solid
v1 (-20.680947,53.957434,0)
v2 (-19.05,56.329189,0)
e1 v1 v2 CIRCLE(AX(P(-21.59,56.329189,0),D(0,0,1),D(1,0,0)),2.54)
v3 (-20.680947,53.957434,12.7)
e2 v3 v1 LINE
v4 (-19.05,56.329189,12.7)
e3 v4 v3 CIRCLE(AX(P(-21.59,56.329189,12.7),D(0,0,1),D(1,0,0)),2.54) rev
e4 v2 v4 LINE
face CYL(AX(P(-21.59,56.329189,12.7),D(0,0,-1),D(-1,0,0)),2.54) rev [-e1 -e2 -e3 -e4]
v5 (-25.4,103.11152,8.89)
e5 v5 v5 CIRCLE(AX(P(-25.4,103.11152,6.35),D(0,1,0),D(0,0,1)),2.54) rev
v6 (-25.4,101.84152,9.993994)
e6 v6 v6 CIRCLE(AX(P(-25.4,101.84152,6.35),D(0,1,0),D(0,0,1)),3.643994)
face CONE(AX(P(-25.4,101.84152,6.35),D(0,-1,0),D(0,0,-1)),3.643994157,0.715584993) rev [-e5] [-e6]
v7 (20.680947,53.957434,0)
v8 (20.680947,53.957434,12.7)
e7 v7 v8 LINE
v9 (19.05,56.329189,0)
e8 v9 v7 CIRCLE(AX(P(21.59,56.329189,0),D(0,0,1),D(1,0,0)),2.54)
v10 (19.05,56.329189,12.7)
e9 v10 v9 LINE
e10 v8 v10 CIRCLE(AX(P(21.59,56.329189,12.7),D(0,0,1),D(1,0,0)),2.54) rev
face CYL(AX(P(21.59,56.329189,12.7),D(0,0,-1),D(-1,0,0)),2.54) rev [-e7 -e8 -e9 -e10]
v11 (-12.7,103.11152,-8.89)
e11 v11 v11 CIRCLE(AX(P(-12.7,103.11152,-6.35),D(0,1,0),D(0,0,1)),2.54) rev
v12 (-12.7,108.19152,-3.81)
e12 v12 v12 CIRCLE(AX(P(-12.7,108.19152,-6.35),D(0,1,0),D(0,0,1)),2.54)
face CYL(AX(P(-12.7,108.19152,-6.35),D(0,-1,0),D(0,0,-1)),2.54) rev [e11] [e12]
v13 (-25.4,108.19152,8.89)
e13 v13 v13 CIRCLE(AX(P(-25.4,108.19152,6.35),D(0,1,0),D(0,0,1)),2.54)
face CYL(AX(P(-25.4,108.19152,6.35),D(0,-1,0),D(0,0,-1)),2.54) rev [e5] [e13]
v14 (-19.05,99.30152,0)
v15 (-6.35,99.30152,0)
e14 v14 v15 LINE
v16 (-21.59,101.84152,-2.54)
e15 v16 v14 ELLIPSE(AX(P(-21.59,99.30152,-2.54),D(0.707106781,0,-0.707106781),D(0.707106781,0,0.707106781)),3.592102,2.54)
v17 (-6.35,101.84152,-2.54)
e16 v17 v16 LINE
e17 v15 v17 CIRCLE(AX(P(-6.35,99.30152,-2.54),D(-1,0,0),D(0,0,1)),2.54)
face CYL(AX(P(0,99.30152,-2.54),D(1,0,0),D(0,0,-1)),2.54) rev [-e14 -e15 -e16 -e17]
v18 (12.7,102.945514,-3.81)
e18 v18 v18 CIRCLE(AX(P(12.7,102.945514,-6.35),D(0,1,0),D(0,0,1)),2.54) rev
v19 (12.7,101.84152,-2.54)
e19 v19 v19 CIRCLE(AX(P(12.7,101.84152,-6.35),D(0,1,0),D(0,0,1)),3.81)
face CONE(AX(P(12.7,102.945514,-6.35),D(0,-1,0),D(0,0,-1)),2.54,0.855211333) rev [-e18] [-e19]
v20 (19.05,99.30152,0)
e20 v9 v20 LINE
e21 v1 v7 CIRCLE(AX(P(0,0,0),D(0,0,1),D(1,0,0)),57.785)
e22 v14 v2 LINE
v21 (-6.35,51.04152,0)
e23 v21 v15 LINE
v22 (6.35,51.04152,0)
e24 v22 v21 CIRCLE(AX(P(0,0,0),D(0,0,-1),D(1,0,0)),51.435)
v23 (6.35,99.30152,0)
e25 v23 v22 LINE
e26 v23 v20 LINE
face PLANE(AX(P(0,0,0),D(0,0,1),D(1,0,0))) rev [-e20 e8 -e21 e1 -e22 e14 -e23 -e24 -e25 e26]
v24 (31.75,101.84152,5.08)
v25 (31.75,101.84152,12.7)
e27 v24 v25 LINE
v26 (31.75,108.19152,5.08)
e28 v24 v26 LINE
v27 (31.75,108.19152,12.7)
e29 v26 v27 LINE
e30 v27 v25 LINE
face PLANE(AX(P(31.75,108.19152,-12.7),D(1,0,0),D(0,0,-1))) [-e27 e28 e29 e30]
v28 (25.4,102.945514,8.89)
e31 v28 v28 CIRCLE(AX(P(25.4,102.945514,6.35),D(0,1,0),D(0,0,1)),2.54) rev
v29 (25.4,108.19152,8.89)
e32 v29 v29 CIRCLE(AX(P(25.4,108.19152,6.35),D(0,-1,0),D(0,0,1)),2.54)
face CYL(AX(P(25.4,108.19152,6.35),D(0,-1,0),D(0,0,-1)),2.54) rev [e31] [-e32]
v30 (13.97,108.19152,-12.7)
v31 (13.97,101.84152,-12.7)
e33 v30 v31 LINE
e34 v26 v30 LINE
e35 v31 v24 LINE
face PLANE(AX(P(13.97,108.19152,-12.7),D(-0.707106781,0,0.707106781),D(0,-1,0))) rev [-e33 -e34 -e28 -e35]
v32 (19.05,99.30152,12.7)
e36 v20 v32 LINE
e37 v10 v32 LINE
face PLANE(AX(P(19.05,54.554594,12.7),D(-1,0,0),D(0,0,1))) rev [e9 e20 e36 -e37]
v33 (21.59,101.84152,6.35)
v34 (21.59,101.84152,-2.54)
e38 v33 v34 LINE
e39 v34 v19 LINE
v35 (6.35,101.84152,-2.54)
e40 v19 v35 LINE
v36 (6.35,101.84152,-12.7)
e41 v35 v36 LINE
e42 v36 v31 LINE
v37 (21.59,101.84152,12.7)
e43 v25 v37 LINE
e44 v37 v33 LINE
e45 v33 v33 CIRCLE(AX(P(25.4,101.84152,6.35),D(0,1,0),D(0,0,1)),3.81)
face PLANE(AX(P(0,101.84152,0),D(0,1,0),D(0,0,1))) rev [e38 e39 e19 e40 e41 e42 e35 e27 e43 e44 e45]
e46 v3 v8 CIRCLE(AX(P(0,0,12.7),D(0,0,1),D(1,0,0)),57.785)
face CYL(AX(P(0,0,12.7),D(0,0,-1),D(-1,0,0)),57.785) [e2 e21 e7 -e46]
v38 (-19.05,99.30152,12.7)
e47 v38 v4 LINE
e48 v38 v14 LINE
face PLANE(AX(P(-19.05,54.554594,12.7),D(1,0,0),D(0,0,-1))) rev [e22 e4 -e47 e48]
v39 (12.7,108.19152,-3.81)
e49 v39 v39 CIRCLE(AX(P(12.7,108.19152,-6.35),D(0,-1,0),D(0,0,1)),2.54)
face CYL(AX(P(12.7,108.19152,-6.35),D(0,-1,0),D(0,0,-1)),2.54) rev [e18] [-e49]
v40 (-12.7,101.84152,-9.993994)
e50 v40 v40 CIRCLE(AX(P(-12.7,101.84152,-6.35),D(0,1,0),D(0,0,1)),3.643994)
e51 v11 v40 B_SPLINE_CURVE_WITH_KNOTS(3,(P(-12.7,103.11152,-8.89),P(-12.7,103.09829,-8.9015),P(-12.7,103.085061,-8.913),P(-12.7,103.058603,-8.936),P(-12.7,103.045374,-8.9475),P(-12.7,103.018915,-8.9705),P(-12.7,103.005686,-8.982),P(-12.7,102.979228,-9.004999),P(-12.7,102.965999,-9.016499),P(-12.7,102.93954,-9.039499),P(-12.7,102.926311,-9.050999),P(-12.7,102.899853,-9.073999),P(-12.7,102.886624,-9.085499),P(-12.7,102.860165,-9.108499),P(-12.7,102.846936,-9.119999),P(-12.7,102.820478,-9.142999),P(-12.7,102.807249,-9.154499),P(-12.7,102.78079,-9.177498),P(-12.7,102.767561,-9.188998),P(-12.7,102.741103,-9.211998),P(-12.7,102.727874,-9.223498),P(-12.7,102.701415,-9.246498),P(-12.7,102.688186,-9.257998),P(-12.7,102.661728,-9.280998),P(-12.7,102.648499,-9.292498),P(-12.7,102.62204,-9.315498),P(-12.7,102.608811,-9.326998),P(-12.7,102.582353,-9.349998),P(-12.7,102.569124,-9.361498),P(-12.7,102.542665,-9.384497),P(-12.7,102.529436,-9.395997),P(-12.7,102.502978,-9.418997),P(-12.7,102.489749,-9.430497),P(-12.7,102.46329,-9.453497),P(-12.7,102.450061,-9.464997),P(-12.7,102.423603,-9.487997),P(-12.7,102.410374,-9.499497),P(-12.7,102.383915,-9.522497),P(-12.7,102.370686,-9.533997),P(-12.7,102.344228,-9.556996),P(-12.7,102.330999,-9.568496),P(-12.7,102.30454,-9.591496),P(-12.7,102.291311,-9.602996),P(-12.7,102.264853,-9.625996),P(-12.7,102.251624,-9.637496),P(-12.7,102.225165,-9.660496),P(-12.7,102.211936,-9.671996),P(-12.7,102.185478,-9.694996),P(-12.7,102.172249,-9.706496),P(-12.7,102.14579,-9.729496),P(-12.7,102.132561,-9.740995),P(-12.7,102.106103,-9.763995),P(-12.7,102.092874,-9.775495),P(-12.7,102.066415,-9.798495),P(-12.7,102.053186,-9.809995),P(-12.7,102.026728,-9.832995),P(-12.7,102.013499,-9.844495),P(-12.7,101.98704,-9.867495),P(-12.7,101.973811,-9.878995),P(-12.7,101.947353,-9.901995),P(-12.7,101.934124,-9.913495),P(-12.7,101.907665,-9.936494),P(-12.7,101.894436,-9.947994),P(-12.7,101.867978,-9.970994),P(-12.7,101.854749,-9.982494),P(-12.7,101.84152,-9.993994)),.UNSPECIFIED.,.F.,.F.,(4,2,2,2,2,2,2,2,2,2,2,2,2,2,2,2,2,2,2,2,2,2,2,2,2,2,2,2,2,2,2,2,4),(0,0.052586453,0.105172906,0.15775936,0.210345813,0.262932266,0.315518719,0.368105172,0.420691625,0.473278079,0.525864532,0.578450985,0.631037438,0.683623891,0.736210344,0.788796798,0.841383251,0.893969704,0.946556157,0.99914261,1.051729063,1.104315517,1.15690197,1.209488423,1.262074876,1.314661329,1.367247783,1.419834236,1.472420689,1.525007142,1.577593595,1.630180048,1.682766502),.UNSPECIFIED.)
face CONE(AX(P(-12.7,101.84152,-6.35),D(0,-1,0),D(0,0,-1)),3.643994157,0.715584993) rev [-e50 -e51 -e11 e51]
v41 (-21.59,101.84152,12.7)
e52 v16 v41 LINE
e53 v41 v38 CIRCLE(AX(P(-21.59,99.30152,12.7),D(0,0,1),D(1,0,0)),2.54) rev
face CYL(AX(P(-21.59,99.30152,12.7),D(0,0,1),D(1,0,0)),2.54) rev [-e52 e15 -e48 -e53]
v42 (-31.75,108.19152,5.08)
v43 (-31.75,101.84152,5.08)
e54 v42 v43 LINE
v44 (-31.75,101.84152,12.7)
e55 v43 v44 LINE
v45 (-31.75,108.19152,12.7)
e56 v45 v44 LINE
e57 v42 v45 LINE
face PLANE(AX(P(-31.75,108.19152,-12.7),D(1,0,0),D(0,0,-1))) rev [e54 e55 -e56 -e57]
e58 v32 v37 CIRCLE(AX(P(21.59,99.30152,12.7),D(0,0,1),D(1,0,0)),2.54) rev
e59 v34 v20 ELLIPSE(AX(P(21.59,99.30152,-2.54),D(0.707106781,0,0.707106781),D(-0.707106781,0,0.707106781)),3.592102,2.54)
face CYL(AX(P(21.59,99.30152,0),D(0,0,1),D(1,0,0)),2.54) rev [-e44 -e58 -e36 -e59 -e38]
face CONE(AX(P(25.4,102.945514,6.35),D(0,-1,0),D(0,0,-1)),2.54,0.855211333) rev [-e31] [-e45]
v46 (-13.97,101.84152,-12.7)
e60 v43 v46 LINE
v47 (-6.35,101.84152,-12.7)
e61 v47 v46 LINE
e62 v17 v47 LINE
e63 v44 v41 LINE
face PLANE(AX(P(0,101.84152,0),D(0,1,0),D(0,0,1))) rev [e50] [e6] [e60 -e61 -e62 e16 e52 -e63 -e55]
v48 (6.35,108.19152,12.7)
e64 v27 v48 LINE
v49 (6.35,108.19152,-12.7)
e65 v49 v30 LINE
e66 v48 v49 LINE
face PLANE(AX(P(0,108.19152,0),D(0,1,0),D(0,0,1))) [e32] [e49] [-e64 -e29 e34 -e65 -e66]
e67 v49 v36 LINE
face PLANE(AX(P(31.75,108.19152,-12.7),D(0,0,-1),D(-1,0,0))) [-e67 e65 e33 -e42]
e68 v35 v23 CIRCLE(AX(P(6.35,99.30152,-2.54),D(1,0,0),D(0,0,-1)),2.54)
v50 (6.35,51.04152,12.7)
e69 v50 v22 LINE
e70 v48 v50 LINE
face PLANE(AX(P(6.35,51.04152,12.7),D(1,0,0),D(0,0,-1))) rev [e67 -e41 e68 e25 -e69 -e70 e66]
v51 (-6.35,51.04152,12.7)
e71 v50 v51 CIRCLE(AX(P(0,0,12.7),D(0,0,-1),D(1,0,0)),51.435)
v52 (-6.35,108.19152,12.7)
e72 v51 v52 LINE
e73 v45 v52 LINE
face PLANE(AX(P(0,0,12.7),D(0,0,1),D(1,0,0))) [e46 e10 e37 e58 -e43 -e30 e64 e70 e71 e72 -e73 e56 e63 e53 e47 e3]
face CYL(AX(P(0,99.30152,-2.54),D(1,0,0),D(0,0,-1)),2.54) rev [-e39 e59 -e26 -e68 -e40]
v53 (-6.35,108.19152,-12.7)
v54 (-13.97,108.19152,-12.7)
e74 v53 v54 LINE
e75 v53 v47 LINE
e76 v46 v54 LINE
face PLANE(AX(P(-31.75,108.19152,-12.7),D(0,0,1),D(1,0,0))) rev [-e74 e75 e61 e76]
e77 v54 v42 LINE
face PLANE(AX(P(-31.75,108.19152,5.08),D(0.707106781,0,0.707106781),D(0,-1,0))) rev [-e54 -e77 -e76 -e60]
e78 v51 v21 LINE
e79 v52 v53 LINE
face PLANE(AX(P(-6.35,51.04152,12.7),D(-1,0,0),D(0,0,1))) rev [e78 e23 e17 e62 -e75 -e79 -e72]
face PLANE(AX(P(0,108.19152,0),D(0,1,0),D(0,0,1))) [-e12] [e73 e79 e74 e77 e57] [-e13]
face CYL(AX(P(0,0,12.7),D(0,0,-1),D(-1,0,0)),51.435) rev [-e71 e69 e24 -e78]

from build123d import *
from OCP.BRepFilletAPI import BRepFilletAPI_MakeChamfer

# Parameters (mm, degrees)
BOSS_EXTRUDE1_DEPTH = 12.7
SKETCH2_W           = 25.4
SKETCH2_H           = 25.4
SKETCH2_R           = 2.54
BOSS_EXTRUDE2_DEPTH = 6.35
CHAMFER2_SIZE       = 1.27
CHAMFER2_SIZE2      = 1.103994157
CHAMFER3_SIZE       = 17.78
FILLET3_R           = 2.54


with BuildPart() as part:
    # Sketch1 → Boss-Extrude1 (new body)
    with BuildSketch(Plane.XY):
        with BuildLine():
            Line((-6.35, 51.041519619), (-6.35, 101.841519619))
            Line((-6.35, 101.841519619), (-19.05, 101.841519619))
            Line((-19.05, 101.841519619), (-19.05, 54.554593986))
            ThreePointArc((-19.05, 54.554593986), (0, -57.785), (19.05, 54.554593986))
            Line((19.05, 54.554593986), (19.05, 101.841519619))
            Line((19.05, 101.841519619), (6.35, 101.841519619))
            Line((6.35, 101.841519619), (6.35, 51.041519619))
            ThreePointArc((6.35, 51.041519619), (0, -51.435), (-6.35, 51.041519619))
        make_face()
    extrude(amount=BOSS_EXTRUDE1_DEPTH)

    # Sketch2 → Boss-Extrude2 (add)
    with BuildSketch(Plane(origin=(0, 101.841519619, 0), x_dir=(1, 0, 0), z_dir=(0, 1, 0))):
        with Locations((-19.05, 0)):
            Rectangle(SKETCH2_W, SKETCH2_H)
        with Locations(Location((-25.4, -6.35, 0), (0, 0, 270))):
            Circle(SKETCH2_R, mode=Mode.SUBTRACT)
        with Locations(Location((-12.7, 6.35, 0), (0, 0, 270))):
            Circle(SKETCH2_R, mode=Mode.SUBTRACT)
    boss_extrude2 = extrude(amount=BOSS_EXTRUDE2_DEPTH)

    # Mirror5: Boss-Extrude2 across plane
    add(boss_extrude2.mirror(Plane(origin=(0, 0, 0), x_dir=(0, 0, 1), z_dir=(1, 0, 0))))

    # Chamfer2: one chamfer whose edges measure the first distance from different faces: ONE call of the kernel's chamfer builder (chamfer() names one face for all edges)
    chamfer2_edges_1 = [part.edges().sort_by_distance(p)[0] for p in [
        (-12.7, 101.841519619, -8.89),
    ]]
    chamfer2_side_1 = [part.faces().sort_by_distance(p)[0] for p in [
        (-12.7, 105.016519619, -8.89),
    ]]
    chamfer2_edges_2 = [part.edges().sort_by_distance(p)[0] for p in [
        (-25.4, 101.841519619, 3.81),
    ]]
    chamfer2_side_2 = [part.faces().sort_by_distance(p)[0] for p in [
        (-25.4, 105.016519619, 3.81),
    ]]
    chamfer2_edges_3 = [part.edges().sort_by_distance(p)[0] for p in [
        (12.7, 101.841519619, -8.89),
        (25.4, 101.841519619, 3.81),
    ]]
    chamfer2_side_3 = [part.faces().sort_by_distance(p)[0] for p in [
        (21.360206035, 101.841519619, -2.310206035),
    ]]
    chamfer2 = BRepFilletAPI_MakeChamfer(part.part.solid().wrapped)
    for e in chamfer2_edges_1:
        chamfer2.Add(CHAMFER2_SIZE, CHAMFER2_SIZE2, e.wrapped, chamfer2_side_1[0].wrapped)  # the first distance lies on this face
    for e in chamfer2_edges_2:
        chamfer2.Add(CHAMFER2_SIZE, CHAMFER2_SIZE2, e.wrapped, chamfer2_side_2[0].wrapped)  # the first distance lies on this face
    for e in chamfer2_edges_3:
        chamfer2.Add(CHAMFER2_SIZE, CHAMFER2_SIZE2, e.wrapped, chamfer2_side_3[0].wrapped)  # the first distance lies on this face
    add(Compound.cast(chamfer2.Shape()), mode=Mode.REPLACE)

    # Chamfer3
    chamfer3_edges = [part.edges().sort_by_distance(p)[0] for p in [
        (-31.75, 105.016519619, -12.7),
        (31.75, 105.016519619, -12.7),
    ]]
    chamfer(chamfer3_edges, length=CHAMFER3_SIZE)

    # Fillet3
    fillet3_edges = [part.edges().sort_by_distance(p)[0] for p in [
        (12.7, 101.841519619, 0),
        (-19.05, 54.554593986, 6.35),
        (-19.05, 101.841519619, 6.35),
        (19.05, 101.841519619, 6.35),
        (19.05, 54.554593986, 6.35),
        (-12.7, 101.841519619, 0),
    ]]
    fillet(fillet3_edges, radius=FILLET3_R - 0.0001)  # a hair under: the kernel refuses the full size


solid = part.part
